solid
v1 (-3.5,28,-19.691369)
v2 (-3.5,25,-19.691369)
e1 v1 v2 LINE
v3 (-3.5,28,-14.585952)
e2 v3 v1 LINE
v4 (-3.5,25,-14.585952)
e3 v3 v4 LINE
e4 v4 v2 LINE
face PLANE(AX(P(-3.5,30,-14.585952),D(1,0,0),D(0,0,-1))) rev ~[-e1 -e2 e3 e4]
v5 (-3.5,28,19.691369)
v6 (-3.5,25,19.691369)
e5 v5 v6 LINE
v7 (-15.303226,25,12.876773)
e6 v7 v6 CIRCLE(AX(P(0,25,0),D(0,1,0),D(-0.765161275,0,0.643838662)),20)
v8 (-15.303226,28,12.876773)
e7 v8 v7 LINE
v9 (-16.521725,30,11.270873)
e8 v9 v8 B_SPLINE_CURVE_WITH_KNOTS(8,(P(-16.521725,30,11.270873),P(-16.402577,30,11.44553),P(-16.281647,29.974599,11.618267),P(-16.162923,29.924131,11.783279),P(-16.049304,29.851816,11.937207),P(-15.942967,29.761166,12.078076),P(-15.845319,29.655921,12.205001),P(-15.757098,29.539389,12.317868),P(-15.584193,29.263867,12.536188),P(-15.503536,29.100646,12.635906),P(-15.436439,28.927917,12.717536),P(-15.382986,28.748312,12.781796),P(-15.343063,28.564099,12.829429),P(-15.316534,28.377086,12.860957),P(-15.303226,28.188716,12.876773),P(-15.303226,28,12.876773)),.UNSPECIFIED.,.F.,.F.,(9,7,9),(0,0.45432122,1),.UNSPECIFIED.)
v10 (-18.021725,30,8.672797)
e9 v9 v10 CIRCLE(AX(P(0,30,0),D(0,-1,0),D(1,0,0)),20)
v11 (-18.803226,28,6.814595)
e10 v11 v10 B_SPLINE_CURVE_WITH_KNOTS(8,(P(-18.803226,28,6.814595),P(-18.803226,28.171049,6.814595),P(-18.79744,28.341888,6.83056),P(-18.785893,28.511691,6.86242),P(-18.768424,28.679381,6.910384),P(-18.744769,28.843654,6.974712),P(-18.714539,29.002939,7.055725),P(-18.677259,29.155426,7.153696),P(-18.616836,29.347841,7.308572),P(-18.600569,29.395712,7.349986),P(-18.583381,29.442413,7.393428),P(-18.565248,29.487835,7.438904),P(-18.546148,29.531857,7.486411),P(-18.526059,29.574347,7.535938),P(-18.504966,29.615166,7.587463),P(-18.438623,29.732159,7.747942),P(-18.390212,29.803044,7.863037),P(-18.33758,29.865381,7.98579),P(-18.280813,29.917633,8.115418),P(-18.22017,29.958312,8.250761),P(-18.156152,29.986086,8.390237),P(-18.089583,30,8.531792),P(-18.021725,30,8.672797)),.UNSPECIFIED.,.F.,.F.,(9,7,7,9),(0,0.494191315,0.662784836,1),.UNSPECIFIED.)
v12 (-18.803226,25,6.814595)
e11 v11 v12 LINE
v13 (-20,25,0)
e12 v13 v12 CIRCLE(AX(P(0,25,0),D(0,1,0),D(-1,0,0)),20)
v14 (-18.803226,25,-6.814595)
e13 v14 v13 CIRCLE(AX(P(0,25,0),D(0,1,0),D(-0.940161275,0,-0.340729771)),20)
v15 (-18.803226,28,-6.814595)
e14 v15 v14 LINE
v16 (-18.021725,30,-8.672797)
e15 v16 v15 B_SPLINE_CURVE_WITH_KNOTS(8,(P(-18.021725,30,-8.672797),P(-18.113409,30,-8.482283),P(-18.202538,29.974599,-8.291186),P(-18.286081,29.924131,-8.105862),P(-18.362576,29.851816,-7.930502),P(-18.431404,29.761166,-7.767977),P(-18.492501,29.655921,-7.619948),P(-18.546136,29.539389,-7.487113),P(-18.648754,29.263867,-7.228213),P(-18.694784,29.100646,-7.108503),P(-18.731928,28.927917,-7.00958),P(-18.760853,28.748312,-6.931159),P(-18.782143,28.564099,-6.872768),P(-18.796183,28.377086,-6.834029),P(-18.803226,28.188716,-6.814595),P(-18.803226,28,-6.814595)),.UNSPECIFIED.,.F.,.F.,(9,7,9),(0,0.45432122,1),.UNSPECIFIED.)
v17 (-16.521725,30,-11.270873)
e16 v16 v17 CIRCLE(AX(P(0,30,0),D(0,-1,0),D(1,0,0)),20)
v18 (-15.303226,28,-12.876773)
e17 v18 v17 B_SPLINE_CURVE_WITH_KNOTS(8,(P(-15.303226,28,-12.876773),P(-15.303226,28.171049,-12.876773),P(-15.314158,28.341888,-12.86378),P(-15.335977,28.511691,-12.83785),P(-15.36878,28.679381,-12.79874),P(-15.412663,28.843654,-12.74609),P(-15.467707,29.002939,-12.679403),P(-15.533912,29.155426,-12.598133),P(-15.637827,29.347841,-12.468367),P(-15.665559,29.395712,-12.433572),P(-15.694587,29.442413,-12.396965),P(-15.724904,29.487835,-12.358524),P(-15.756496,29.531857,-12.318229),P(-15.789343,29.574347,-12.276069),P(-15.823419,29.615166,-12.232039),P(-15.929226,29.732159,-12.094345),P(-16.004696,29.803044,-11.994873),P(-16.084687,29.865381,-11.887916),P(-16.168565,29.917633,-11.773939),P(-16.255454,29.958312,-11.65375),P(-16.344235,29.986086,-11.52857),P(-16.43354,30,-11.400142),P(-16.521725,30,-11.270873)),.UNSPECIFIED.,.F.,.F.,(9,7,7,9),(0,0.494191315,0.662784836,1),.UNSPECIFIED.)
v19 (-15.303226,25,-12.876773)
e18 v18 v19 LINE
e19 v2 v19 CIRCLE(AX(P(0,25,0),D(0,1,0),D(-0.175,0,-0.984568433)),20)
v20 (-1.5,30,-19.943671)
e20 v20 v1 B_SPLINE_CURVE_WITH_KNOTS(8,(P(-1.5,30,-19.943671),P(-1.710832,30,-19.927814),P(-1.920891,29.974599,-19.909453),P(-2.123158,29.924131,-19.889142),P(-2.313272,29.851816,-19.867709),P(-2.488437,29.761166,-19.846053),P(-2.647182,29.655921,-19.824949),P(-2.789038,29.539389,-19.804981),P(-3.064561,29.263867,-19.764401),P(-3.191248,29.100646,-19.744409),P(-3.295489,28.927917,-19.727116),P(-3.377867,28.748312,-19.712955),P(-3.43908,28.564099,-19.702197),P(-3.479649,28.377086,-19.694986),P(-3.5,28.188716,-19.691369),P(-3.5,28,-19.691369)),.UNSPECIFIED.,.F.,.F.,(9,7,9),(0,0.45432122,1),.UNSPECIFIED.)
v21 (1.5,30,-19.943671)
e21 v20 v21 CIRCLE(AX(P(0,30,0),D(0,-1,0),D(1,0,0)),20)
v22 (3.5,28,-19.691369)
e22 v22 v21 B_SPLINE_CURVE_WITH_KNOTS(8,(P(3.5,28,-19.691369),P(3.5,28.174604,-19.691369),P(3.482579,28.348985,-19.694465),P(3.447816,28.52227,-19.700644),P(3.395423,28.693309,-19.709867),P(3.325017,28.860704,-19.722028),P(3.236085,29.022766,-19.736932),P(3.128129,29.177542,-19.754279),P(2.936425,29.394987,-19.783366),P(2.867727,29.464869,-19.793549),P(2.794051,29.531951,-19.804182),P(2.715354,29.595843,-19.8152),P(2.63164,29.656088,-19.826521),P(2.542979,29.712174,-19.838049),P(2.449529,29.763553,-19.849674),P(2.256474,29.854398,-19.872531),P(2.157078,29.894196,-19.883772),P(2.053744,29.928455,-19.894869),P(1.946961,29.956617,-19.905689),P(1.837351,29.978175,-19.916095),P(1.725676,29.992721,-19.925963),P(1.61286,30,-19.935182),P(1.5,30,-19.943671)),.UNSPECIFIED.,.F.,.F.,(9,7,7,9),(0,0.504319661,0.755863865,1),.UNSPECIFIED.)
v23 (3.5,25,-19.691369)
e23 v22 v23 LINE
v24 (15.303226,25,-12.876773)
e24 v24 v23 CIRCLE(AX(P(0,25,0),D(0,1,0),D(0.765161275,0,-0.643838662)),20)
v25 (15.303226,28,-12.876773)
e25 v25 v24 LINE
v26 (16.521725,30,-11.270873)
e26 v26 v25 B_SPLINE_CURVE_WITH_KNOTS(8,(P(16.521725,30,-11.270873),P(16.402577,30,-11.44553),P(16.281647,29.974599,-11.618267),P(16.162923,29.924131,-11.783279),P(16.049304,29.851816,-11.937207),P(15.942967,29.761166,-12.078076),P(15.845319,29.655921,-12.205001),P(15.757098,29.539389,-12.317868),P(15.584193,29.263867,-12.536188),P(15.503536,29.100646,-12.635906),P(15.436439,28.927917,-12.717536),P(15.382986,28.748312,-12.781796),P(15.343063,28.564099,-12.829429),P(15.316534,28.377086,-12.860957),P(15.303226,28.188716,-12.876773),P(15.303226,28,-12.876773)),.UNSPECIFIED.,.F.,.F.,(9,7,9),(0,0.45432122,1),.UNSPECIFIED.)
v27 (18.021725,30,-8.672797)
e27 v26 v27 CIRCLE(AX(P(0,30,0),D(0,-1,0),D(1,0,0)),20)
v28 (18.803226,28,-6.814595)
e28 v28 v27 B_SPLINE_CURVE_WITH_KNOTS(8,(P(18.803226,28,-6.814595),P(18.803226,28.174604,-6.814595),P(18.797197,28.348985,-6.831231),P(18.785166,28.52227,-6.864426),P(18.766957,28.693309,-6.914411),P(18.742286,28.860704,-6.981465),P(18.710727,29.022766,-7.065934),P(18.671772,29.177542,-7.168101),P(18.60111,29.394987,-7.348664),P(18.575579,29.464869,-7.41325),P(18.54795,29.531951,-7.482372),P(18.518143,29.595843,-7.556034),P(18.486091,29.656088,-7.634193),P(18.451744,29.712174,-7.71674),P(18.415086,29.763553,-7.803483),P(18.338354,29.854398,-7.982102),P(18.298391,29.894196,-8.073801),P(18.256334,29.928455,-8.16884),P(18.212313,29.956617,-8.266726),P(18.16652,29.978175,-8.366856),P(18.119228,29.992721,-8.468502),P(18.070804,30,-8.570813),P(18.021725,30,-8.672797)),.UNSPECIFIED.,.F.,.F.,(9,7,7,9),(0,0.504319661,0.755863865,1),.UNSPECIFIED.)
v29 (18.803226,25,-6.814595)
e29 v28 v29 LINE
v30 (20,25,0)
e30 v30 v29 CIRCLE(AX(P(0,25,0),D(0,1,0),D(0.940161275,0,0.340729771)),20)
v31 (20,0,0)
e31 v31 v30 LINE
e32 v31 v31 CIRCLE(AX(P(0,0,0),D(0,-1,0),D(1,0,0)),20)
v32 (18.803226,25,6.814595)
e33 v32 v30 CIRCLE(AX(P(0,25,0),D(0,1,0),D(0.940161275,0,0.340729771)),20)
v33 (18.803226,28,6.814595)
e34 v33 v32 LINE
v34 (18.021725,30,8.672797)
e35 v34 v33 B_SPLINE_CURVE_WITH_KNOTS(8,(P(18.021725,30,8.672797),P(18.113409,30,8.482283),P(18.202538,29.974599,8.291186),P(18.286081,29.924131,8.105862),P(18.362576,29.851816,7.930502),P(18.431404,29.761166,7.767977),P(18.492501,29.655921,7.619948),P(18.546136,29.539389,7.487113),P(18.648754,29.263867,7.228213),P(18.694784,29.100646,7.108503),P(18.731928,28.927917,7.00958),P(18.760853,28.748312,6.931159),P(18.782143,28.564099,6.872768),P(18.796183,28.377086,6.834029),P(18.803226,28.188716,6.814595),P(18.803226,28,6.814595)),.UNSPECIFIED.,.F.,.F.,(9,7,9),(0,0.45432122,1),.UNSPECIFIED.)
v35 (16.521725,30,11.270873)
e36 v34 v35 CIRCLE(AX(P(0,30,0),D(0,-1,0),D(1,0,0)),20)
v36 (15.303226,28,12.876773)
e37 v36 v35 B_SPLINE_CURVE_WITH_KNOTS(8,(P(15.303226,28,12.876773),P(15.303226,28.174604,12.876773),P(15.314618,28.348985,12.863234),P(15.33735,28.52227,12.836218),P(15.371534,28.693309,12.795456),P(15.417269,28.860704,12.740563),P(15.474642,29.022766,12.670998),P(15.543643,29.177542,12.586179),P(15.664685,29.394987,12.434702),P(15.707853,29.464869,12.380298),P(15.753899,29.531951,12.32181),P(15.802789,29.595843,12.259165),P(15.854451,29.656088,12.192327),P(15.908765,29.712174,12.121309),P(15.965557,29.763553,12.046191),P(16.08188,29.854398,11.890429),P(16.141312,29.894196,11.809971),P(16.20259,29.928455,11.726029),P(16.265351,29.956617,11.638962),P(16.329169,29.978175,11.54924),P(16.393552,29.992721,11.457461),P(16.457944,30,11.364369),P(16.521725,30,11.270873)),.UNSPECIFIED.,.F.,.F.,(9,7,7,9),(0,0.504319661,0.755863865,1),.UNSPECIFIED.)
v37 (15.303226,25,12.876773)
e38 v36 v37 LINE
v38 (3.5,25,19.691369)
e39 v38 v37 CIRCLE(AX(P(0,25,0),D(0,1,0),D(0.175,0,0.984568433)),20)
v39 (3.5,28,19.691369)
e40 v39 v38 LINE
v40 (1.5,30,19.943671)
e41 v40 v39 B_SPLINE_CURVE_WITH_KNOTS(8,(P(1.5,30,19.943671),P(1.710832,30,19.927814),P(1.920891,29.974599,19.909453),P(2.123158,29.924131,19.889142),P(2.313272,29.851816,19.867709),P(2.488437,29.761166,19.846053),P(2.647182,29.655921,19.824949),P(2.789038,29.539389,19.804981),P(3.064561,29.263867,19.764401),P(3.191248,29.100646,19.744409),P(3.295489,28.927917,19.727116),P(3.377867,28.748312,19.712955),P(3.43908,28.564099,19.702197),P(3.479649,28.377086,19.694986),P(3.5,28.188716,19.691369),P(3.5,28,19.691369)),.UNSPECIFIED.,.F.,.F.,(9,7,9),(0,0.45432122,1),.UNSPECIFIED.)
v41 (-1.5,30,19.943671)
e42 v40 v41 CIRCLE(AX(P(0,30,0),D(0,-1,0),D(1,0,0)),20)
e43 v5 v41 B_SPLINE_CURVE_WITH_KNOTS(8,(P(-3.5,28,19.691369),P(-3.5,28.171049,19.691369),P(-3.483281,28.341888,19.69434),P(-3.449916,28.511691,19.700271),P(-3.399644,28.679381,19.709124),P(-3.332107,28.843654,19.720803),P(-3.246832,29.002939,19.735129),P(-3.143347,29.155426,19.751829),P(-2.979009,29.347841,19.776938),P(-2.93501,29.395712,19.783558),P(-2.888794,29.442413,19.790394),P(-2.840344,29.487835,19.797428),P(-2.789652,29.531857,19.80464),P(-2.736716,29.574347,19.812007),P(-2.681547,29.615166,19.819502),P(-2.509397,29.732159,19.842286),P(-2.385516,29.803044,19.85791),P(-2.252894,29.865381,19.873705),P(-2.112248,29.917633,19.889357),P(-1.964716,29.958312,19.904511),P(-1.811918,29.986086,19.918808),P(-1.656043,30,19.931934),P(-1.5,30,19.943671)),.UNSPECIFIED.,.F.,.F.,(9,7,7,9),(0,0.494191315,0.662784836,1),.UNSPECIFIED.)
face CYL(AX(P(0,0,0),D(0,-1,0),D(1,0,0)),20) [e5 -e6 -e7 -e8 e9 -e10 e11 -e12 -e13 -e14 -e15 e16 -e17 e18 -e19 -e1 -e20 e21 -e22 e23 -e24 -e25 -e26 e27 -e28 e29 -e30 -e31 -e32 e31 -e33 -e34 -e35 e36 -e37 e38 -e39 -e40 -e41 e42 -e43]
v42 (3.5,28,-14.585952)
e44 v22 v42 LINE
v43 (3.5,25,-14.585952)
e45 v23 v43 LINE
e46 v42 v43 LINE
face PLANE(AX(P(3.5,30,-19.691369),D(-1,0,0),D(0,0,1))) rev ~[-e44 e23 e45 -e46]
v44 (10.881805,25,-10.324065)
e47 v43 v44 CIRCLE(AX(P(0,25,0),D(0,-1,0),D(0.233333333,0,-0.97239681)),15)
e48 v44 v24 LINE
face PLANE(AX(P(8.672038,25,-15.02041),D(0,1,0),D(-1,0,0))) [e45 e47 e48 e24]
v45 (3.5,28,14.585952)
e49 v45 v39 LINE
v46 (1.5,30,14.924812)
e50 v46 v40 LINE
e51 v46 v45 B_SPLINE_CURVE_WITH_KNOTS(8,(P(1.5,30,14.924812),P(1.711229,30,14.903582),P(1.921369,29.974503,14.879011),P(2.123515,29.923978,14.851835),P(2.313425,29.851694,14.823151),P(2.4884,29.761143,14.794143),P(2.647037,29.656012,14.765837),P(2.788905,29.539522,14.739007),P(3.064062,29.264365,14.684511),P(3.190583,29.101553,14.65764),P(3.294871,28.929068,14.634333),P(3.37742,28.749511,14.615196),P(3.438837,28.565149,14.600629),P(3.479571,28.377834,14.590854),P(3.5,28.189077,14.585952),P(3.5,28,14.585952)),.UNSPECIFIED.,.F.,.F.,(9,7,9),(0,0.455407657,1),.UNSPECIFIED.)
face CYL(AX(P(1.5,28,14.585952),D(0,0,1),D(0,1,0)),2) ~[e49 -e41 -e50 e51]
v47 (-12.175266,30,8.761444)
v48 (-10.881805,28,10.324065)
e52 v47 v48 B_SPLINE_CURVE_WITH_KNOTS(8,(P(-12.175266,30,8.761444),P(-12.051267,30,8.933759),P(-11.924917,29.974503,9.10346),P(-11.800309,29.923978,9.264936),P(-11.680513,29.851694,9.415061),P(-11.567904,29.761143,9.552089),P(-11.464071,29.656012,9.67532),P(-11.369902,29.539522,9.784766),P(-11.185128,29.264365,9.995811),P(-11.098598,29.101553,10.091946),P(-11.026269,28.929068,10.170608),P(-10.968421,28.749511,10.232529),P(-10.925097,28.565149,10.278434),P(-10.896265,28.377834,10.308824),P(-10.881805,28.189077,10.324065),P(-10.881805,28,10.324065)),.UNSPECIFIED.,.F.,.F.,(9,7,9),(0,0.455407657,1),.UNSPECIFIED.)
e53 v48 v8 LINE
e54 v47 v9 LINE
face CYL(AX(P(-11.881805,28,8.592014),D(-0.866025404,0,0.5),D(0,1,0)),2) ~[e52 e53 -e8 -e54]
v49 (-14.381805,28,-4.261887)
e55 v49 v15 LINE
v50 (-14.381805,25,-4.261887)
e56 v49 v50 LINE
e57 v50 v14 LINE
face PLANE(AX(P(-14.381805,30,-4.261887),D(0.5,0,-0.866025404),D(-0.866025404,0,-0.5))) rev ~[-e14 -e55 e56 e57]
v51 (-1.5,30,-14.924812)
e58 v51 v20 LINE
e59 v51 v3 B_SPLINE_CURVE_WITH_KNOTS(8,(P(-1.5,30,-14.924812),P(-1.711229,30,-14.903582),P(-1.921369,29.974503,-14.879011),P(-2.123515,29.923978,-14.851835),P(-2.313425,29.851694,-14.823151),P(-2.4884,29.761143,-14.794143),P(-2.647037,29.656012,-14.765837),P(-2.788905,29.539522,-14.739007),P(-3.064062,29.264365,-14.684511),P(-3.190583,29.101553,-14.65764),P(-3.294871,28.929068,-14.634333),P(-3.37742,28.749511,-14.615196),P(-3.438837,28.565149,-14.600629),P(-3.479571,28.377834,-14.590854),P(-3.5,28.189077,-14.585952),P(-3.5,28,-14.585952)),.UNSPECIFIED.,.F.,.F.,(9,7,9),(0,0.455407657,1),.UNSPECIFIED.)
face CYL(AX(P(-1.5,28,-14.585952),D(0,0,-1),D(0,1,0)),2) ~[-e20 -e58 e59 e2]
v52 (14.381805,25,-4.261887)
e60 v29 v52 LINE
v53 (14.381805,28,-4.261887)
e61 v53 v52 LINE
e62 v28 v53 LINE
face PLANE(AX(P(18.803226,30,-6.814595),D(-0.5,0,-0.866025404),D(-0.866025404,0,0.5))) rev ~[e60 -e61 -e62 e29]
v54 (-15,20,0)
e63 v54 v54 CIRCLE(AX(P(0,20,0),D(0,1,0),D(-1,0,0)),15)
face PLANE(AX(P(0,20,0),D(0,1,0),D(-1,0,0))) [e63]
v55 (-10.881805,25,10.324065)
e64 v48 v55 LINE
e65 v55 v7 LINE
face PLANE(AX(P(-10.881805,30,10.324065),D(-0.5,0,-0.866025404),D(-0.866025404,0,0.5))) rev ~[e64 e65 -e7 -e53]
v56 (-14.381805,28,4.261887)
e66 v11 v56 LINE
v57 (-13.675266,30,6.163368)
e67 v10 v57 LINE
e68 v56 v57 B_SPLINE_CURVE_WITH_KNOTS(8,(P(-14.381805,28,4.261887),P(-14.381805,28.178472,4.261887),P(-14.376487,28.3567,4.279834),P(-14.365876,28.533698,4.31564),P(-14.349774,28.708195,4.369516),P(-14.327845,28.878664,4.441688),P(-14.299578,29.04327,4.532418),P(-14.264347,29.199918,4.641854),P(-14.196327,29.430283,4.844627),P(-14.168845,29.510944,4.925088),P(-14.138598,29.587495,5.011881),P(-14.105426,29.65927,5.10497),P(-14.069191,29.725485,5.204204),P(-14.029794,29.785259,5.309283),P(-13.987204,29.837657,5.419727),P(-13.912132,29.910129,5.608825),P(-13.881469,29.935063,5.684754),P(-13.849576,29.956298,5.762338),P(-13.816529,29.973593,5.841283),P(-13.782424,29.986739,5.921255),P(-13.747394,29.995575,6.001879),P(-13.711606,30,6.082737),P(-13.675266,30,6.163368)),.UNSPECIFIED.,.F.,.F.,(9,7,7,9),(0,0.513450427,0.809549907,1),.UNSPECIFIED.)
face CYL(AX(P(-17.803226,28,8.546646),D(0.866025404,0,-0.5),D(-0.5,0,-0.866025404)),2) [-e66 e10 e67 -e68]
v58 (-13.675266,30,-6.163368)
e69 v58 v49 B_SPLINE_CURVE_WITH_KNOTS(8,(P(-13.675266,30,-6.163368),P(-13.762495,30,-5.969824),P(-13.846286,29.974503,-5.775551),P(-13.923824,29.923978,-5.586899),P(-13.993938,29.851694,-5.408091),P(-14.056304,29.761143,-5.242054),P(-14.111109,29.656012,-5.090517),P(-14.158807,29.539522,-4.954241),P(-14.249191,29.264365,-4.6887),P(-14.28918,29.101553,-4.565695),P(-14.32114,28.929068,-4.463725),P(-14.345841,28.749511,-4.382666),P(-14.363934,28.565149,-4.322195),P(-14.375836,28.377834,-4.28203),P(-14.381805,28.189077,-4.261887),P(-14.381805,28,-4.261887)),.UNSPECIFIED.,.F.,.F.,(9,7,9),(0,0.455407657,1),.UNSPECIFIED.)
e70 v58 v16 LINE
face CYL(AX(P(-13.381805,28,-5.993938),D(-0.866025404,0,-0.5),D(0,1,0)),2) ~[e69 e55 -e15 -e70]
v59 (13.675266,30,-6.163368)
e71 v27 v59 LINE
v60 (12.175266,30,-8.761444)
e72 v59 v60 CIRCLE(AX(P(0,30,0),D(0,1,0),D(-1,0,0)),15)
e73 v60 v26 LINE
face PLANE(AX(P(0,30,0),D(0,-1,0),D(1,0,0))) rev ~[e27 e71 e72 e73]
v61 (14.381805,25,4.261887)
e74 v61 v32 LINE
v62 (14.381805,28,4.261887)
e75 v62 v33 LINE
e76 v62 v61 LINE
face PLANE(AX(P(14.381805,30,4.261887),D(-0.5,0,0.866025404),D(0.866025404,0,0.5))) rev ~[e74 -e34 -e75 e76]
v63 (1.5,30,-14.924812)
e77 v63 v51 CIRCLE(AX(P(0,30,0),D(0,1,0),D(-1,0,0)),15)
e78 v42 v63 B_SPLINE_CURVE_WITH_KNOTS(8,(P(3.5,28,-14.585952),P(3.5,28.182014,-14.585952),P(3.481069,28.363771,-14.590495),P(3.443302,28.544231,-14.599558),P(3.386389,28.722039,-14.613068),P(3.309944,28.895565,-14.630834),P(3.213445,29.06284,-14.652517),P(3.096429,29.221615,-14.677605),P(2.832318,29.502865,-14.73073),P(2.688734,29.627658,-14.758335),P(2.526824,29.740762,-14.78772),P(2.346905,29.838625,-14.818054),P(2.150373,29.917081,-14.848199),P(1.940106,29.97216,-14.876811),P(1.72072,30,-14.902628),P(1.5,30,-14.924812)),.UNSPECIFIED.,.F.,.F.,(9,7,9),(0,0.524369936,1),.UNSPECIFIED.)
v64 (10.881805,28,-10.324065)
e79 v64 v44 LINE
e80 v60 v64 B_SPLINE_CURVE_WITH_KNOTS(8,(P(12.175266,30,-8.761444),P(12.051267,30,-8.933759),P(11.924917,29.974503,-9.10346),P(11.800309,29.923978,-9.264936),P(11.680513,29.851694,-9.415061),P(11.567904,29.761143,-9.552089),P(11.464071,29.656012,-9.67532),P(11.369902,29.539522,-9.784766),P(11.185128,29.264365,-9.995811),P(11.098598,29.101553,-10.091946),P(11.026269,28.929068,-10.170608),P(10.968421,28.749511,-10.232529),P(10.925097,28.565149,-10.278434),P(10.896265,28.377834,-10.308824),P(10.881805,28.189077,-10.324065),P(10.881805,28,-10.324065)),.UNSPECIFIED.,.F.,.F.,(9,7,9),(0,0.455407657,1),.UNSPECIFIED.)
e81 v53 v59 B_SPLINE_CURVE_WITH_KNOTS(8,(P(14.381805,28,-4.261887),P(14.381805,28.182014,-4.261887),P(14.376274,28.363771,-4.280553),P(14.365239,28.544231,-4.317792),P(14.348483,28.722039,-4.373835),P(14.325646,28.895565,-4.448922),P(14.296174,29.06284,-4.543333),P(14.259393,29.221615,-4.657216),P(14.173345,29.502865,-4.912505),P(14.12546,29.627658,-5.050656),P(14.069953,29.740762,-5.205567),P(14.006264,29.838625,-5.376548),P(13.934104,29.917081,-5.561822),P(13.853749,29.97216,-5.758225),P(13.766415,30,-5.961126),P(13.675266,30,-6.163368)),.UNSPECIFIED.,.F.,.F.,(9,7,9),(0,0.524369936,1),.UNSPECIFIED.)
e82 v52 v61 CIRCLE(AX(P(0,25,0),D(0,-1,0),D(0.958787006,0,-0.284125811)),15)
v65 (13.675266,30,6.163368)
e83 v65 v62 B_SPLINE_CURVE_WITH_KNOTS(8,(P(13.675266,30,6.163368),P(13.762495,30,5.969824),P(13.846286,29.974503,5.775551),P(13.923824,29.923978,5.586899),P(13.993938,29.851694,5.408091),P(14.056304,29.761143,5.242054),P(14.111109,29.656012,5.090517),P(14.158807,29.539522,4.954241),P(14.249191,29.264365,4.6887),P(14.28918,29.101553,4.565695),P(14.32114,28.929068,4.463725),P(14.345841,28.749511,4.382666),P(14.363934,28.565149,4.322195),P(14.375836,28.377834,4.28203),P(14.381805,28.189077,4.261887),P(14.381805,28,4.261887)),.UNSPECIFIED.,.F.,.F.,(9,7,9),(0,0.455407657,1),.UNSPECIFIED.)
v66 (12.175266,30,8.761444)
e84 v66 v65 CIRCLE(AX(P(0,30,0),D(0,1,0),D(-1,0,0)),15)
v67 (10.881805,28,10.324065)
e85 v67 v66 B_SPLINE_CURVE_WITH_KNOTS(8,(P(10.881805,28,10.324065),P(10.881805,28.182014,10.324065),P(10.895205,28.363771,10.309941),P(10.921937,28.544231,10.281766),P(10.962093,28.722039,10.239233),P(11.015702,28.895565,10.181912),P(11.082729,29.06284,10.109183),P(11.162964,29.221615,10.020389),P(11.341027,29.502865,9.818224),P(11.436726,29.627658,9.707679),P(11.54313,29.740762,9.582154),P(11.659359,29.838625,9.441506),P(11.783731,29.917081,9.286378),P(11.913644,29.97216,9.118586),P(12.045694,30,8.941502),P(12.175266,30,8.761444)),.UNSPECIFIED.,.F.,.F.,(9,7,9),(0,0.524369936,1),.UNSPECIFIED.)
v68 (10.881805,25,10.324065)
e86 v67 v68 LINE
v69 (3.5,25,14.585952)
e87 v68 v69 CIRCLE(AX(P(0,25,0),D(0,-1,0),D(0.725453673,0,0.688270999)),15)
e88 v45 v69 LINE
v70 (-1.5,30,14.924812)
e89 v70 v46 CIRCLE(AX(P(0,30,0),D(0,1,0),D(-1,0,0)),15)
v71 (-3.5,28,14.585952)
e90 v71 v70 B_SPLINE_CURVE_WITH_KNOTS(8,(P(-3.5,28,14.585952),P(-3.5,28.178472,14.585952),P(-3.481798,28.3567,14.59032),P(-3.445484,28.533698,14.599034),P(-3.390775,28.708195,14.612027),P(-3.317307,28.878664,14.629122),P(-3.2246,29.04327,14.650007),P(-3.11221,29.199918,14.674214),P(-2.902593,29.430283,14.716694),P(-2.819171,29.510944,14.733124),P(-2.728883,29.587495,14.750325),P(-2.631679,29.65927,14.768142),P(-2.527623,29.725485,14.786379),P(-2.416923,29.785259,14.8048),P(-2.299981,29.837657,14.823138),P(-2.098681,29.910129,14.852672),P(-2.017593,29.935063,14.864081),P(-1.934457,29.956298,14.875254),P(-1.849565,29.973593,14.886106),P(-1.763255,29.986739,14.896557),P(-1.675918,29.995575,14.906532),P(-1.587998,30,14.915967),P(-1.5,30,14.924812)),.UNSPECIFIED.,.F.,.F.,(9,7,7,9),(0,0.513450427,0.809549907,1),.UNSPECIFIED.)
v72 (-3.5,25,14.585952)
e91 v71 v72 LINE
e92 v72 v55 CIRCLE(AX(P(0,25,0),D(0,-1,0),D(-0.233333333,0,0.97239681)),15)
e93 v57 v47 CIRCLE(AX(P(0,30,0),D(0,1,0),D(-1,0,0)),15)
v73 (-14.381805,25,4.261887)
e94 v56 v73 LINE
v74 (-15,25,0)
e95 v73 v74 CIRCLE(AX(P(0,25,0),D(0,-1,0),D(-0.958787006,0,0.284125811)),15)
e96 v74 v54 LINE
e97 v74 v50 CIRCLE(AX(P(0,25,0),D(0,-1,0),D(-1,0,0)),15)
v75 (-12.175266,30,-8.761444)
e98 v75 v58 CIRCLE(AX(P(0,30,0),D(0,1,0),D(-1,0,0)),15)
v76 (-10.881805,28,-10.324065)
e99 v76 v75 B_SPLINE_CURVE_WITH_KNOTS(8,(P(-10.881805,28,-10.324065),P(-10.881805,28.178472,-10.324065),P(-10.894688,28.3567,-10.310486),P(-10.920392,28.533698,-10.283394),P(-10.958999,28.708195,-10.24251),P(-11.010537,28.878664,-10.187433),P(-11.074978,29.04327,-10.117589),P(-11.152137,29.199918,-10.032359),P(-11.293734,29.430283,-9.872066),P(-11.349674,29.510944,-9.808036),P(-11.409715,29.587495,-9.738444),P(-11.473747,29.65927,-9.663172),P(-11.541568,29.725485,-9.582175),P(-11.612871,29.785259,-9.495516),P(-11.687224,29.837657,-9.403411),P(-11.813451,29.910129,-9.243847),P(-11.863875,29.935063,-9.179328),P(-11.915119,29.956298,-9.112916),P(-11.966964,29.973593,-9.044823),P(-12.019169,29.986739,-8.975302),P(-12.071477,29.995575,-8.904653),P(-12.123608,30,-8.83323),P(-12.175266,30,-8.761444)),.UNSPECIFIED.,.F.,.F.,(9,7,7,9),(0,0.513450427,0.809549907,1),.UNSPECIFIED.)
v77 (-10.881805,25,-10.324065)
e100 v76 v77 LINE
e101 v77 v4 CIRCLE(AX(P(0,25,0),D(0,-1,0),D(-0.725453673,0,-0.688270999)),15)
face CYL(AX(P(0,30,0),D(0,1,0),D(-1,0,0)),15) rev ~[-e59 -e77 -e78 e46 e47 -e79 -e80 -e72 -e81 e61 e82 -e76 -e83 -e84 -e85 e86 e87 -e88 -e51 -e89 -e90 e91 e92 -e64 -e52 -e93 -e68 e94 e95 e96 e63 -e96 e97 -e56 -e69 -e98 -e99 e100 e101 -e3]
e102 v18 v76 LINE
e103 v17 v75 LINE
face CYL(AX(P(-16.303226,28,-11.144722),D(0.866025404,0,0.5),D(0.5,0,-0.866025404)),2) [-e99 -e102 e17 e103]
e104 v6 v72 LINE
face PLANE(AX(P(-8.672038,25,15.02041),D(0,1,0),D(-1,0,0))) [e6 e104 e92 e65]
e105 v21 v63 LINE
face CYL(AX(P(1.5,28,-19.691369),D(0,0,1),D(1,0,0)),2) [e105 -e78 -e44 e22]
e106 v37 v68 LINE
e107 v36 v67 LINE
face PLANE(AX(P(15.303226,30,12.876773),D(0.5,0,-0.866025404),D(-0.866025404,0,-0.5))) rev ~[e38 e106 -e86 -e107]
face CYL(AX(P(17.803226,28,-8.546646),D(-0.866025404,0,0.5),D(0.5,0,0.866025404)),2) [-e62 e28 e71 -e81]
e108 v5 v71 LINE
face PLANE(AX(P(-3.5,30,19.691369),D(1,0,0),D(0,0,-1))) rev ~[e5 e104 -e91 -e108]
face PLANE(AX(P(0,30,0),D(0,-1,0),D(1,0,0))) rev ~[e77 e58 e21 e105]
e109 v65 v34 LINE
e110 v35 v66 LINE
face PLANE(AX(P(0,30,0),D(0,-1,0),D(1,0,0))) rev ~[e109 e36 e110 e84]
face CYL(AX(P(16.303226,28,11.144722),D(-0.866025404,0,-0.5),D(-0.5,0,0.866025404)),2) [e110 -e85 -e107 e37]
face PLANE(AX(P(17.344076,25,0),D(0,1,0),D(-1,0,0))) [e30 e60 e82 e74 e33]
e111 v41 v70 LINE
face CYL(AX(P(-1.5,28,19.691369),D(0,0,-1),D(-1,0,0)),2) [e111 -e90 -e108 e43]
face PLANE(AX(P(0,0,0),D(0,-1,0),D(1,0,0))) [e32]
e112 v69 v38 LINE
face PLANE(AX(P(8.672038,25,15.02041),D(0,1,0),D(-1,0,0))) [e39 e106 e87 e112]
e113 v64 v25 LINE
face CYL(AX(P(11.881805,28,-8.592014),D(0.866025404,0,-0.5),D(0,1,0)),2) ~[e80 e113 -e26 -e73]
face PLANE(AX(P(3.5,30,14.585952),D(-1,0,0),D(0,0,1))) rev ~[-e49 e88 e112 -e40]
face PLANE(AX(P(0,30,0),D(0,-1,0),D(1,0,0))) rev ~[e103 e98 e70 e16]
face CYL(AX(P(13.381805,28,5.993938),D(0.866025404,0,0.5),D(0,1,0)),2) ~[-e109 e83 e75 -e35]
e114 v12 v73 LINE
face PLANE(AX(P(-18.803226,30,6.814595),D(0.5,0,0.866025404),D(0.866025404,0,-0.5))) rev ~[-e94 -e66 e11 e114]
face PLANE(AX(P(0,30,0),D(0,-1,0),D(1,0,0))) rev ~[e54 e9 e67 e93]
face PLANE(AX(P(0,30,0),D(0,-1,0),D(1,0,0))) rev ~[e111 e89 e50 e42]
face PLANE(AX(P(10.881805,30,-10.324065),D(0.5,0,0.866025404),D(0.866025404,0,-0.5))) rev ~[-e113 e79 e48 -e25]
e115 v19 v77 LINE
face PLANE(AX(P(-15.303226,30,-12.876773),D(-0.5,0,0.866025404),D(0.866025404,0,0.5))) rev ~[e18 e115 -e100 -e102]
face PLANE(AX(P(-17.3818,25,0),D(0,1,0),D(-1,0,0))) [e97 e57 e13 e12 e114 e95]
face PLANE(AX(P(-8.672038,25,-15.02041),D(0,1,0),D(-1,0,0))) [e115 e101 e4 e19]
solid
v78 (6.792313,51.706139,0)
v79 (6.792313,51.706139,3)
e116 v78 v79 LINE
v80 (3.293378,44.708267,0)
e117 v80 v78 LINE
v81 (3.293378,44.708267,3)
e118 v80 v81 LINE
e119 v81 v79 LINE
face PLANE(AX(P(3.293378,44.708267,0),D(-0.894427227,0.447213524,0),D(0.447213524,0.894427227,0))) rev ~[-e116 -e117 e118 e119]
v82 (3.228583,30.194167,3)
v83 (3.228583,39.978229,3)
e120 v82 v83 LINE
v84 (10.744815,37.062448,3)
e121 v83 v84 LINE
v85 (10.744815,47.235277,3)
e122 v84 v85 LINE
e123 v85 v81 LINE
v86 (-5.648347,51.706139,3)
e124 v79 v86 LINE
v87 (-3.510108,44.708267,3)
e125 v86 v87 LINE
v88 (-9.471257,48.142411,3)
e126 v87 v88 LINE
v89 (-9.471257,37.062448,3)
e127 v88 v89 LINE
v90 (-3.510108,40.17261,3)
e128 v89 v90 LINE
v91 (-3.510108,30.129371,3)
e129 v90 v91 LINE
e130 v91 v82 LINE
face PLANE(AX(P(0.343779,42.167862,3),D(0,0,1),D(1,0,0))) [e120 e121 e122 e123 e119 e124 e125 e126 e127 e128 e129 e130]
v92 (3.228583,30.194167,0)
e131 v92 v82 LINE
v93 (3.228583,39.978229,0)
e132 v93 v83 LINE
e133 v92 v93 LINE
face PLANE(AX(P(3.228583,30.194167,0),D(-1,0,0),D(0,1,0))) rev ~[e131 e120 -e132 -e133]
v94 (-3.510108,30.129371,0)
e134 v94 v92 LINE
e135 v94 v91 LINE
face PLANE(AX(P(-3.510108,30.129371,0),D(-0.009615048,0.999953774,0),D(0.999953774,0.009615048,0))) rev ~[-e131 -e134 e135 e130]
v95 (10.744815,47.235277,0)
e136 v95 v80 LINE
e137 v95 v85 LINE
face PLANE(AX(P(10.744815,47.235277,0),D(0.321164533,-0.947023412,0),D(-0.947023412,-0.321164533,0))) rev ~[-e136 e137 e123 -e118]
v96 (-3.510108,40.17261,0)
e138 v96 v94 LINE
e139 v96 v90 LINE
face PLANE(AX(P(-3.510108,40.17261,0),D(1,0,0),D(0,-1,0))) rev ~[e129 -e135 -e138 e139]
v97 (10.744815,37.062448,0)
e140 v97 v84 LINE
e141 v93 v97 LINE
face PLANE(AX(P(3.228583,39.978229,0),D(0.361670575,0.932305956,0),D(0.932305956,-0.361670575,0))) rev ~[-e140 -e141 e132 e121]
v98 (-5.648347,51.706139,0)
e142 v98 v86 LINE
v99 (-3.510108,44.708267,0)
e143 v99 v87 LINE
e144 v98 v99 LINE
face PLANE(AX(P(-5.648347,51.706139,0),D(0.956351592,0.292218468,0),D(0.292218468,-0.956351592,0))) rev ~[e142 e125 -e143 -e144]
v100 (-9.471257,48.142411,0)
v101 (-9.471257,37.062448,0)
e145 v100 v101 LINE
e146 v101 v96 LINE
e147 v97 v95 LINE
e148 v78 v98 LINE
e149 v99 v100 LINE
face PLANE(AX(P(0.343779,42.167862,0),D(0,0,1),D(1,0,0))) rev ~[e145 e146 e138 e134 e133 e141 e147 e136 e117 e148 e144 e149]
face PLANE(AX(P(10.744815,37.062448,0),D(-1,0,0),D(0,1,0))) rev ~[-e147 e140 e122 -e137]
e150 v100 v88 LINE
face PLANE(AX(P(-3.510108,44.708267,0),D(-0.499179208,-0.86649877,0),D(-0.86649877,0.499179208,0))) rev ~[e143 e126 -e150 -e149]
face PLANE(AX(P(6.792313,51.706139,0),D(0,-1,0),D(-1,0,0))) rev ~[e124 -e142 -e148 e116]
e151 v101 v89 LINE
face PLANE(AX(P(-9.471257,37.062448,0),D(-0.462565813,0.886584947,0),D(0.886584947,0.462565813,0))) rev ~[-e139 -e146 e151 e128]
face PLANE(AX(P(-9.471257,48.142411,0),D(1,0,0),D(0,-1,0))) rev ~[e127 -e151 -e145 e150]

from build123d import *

# Parameters (mm, degrees)
F0_R     = 20
F1_DEPTH = 30
F2_R     = 15
F3_DEPTH = 10
F5_DEPTH = 5
F6_R     = 2
F8_DEPTH = 3


# Not quite as in the source:
# - a feature names something its author has since deleted; it is built from what else it names


with BuildPart() as f1:
    # F0 (on Front) → F1 (new body)
    with BuildSketch(Plane.XZ):
        Circle(F0_R)
    extrude(amount=-F1_DEPTH)

    # F2 (on face) → F3 (cut)
    with BuildSketch(Plane(origin=(0, 30, 0), x_dir=(-1, 0, 0), z_dir=(0, 1, 0))):
        Circle(F2_R)
    extrude(amount=-F3_DEPTH, mode=Mode.SUBTRACT)

    # F4 (on face) → F5 (cut)
    with BuildSketch(Plane(origin=(0, 30, 0), x_dir=(-1, 0, 0), z_dir=(0, 1, 0))):
        with BuildLine():
            Line((-3.5, -19.6913686675), (-3.5, -14.5859521458))
            ThreePointArc((-3.5, -14.5859521458), (-7.5, -12.9903810568), (-10.8818050967, -10.3240649862))
            Line((-10.8818050967, -10.3240649862), (-15.3032255014, -12.876773247))
            ThreePointArc((-15.3032255014, -12.876773247), (-10, -17.3205080757), (-3.5, -19.6913686675))
        make_face()
        with BuildLine():
            Line((-18.8032255014, -6.8145954205), (-14.3818050967, -4.2618871597))
            ThreePointArc((-14.3818050967, -4.2618871597), (-15, 0), (-14.3818050967, 4.2618871597))
            Line((-14.3818050967, 4.2618871597), (-18.8032255014, 6.8145954205))
            ThreePointArc((-18.8032255014, 6.8145954205), (-20, 0), (-18.8032255014, -6.8145954205))
        make_face()
        with BuildLine():
            Line((-15.3032255014, 12.876773247), (-10.8818050967, 10.3240649862))
            ThreePointArc((-10.8818050967, 10.3240649862), (-7.5, 12.9903810568), (-3.5, 14.5859521458))
            Line((-3.5, 14.5859521458), (-3.5, 19.6913686675))
            ThreePointArc((-3.5, 19.6913686675), (-10, 17.3205080757), (-15.3032255014, 12.876773247))
        make_face()
        with BuildLine():
            ThreePointArc((3.5, 14.5859521458), (7.5, 12.9903810568), (10.8818050967, 10.3240649862))
            Line((10.8818050967, 10.3240649862), (15.3032255014, 12.876773247))
            ThreePointArc((15.3032255014, 12.876773247), (10, 17.3205080757), (3.5, 19.6913686675))
            Line((3.5, 19.6913686675), (3.5, 14.5859521458))
        make_face()
        with BuildLine():
            ThreePointArc((15, 0), (14.8446467868, -2.1532444764), (14.3818050967, -4.2618871597))
            Line((14.3818050967, -4.2618871597), (18.8032255014, -6.8145954205))
            ThreePointArc((18.8032255014, -6.8145954205), (19.6985343367, -3.4594428723), (20, 0))
            ThreePointArc((20, 0), (19.6985343367, 3.4594428723), (18.8032255014, 6.8145954205))
            Line((18.8032255014, 6.8145954205), (14.3818050967, 4.2618871597))
            ThreePointArc((14.3818050967, 4.2618871597), (14.8446467868, 2.1532444764), (15, 0))
        make_face()
        with BuildLine():
            ThreePointArc((10.8818050967, -10.3240649862), (7.5, -12.9903810568), (3.5, -14.5859521458))
            Line((3.5, -14.5859521458), (3.5, -19.6913686675))
            ThreePointArc((3.5, -19.6913686675), (10, -17.3205080757), (15.3032255014, -12.876773247))
            Line((15.3032255014, -12.876773247), (10.8818050967, -10.3240649862))
        make_face()
    extrude(amount=-F5_DEPTH, mode=Mode.SUBTRACT)

    # F6
    f6_edges = [f1.edges().sort_by_distance(p)[0] for p in [
        (-3.5, 30, -17.13866),
        (3.5, 30, -17.13866),
        (13.092515, 30, -11.600419),
        (16.592515, 30, -5.538241),
        (16.592515, 30, 5.538241),
        (3.5, 30, 17.13866),
        (-3.5, 30, 17.13866),
        (-13.092515, 30, 11.600419),
        (-16.592515, 30, 5.538241),
        (-16.592515, 30, -5.538241),
        (-13.092515, 30, -11.600419),
        (13.092515, 30, 11.600419),
    ]]
    fillet(f6_edges, radius=F6_R)


with BuildPart() as f8:
    # F7 (on Top) → F8 (new body)
    with BuildSketch(Plane.XY):
        Polygon((-3.5101084504, 40.1726104319), (-3.5101084504, 30.1293712109), (3.2285826746, 30.1941670477), (3.2285826746, 39.9782285094), (10.744814761, 37.0624475181), (10.744814761, 47.2352765501), (3.2933775801, 44.7082668543), (6.7923129536, 51.7061389983), (-5.6483466178, 51.7061389983), (-3.5101084504, 44.7082668543), (-9.4712572172, 48.1424108148), (-9.4712572172, 37.0624475181), align=None)
    extrude(amount=F8_DEPTH)


solid = Compound([f1.part, f8.part])
